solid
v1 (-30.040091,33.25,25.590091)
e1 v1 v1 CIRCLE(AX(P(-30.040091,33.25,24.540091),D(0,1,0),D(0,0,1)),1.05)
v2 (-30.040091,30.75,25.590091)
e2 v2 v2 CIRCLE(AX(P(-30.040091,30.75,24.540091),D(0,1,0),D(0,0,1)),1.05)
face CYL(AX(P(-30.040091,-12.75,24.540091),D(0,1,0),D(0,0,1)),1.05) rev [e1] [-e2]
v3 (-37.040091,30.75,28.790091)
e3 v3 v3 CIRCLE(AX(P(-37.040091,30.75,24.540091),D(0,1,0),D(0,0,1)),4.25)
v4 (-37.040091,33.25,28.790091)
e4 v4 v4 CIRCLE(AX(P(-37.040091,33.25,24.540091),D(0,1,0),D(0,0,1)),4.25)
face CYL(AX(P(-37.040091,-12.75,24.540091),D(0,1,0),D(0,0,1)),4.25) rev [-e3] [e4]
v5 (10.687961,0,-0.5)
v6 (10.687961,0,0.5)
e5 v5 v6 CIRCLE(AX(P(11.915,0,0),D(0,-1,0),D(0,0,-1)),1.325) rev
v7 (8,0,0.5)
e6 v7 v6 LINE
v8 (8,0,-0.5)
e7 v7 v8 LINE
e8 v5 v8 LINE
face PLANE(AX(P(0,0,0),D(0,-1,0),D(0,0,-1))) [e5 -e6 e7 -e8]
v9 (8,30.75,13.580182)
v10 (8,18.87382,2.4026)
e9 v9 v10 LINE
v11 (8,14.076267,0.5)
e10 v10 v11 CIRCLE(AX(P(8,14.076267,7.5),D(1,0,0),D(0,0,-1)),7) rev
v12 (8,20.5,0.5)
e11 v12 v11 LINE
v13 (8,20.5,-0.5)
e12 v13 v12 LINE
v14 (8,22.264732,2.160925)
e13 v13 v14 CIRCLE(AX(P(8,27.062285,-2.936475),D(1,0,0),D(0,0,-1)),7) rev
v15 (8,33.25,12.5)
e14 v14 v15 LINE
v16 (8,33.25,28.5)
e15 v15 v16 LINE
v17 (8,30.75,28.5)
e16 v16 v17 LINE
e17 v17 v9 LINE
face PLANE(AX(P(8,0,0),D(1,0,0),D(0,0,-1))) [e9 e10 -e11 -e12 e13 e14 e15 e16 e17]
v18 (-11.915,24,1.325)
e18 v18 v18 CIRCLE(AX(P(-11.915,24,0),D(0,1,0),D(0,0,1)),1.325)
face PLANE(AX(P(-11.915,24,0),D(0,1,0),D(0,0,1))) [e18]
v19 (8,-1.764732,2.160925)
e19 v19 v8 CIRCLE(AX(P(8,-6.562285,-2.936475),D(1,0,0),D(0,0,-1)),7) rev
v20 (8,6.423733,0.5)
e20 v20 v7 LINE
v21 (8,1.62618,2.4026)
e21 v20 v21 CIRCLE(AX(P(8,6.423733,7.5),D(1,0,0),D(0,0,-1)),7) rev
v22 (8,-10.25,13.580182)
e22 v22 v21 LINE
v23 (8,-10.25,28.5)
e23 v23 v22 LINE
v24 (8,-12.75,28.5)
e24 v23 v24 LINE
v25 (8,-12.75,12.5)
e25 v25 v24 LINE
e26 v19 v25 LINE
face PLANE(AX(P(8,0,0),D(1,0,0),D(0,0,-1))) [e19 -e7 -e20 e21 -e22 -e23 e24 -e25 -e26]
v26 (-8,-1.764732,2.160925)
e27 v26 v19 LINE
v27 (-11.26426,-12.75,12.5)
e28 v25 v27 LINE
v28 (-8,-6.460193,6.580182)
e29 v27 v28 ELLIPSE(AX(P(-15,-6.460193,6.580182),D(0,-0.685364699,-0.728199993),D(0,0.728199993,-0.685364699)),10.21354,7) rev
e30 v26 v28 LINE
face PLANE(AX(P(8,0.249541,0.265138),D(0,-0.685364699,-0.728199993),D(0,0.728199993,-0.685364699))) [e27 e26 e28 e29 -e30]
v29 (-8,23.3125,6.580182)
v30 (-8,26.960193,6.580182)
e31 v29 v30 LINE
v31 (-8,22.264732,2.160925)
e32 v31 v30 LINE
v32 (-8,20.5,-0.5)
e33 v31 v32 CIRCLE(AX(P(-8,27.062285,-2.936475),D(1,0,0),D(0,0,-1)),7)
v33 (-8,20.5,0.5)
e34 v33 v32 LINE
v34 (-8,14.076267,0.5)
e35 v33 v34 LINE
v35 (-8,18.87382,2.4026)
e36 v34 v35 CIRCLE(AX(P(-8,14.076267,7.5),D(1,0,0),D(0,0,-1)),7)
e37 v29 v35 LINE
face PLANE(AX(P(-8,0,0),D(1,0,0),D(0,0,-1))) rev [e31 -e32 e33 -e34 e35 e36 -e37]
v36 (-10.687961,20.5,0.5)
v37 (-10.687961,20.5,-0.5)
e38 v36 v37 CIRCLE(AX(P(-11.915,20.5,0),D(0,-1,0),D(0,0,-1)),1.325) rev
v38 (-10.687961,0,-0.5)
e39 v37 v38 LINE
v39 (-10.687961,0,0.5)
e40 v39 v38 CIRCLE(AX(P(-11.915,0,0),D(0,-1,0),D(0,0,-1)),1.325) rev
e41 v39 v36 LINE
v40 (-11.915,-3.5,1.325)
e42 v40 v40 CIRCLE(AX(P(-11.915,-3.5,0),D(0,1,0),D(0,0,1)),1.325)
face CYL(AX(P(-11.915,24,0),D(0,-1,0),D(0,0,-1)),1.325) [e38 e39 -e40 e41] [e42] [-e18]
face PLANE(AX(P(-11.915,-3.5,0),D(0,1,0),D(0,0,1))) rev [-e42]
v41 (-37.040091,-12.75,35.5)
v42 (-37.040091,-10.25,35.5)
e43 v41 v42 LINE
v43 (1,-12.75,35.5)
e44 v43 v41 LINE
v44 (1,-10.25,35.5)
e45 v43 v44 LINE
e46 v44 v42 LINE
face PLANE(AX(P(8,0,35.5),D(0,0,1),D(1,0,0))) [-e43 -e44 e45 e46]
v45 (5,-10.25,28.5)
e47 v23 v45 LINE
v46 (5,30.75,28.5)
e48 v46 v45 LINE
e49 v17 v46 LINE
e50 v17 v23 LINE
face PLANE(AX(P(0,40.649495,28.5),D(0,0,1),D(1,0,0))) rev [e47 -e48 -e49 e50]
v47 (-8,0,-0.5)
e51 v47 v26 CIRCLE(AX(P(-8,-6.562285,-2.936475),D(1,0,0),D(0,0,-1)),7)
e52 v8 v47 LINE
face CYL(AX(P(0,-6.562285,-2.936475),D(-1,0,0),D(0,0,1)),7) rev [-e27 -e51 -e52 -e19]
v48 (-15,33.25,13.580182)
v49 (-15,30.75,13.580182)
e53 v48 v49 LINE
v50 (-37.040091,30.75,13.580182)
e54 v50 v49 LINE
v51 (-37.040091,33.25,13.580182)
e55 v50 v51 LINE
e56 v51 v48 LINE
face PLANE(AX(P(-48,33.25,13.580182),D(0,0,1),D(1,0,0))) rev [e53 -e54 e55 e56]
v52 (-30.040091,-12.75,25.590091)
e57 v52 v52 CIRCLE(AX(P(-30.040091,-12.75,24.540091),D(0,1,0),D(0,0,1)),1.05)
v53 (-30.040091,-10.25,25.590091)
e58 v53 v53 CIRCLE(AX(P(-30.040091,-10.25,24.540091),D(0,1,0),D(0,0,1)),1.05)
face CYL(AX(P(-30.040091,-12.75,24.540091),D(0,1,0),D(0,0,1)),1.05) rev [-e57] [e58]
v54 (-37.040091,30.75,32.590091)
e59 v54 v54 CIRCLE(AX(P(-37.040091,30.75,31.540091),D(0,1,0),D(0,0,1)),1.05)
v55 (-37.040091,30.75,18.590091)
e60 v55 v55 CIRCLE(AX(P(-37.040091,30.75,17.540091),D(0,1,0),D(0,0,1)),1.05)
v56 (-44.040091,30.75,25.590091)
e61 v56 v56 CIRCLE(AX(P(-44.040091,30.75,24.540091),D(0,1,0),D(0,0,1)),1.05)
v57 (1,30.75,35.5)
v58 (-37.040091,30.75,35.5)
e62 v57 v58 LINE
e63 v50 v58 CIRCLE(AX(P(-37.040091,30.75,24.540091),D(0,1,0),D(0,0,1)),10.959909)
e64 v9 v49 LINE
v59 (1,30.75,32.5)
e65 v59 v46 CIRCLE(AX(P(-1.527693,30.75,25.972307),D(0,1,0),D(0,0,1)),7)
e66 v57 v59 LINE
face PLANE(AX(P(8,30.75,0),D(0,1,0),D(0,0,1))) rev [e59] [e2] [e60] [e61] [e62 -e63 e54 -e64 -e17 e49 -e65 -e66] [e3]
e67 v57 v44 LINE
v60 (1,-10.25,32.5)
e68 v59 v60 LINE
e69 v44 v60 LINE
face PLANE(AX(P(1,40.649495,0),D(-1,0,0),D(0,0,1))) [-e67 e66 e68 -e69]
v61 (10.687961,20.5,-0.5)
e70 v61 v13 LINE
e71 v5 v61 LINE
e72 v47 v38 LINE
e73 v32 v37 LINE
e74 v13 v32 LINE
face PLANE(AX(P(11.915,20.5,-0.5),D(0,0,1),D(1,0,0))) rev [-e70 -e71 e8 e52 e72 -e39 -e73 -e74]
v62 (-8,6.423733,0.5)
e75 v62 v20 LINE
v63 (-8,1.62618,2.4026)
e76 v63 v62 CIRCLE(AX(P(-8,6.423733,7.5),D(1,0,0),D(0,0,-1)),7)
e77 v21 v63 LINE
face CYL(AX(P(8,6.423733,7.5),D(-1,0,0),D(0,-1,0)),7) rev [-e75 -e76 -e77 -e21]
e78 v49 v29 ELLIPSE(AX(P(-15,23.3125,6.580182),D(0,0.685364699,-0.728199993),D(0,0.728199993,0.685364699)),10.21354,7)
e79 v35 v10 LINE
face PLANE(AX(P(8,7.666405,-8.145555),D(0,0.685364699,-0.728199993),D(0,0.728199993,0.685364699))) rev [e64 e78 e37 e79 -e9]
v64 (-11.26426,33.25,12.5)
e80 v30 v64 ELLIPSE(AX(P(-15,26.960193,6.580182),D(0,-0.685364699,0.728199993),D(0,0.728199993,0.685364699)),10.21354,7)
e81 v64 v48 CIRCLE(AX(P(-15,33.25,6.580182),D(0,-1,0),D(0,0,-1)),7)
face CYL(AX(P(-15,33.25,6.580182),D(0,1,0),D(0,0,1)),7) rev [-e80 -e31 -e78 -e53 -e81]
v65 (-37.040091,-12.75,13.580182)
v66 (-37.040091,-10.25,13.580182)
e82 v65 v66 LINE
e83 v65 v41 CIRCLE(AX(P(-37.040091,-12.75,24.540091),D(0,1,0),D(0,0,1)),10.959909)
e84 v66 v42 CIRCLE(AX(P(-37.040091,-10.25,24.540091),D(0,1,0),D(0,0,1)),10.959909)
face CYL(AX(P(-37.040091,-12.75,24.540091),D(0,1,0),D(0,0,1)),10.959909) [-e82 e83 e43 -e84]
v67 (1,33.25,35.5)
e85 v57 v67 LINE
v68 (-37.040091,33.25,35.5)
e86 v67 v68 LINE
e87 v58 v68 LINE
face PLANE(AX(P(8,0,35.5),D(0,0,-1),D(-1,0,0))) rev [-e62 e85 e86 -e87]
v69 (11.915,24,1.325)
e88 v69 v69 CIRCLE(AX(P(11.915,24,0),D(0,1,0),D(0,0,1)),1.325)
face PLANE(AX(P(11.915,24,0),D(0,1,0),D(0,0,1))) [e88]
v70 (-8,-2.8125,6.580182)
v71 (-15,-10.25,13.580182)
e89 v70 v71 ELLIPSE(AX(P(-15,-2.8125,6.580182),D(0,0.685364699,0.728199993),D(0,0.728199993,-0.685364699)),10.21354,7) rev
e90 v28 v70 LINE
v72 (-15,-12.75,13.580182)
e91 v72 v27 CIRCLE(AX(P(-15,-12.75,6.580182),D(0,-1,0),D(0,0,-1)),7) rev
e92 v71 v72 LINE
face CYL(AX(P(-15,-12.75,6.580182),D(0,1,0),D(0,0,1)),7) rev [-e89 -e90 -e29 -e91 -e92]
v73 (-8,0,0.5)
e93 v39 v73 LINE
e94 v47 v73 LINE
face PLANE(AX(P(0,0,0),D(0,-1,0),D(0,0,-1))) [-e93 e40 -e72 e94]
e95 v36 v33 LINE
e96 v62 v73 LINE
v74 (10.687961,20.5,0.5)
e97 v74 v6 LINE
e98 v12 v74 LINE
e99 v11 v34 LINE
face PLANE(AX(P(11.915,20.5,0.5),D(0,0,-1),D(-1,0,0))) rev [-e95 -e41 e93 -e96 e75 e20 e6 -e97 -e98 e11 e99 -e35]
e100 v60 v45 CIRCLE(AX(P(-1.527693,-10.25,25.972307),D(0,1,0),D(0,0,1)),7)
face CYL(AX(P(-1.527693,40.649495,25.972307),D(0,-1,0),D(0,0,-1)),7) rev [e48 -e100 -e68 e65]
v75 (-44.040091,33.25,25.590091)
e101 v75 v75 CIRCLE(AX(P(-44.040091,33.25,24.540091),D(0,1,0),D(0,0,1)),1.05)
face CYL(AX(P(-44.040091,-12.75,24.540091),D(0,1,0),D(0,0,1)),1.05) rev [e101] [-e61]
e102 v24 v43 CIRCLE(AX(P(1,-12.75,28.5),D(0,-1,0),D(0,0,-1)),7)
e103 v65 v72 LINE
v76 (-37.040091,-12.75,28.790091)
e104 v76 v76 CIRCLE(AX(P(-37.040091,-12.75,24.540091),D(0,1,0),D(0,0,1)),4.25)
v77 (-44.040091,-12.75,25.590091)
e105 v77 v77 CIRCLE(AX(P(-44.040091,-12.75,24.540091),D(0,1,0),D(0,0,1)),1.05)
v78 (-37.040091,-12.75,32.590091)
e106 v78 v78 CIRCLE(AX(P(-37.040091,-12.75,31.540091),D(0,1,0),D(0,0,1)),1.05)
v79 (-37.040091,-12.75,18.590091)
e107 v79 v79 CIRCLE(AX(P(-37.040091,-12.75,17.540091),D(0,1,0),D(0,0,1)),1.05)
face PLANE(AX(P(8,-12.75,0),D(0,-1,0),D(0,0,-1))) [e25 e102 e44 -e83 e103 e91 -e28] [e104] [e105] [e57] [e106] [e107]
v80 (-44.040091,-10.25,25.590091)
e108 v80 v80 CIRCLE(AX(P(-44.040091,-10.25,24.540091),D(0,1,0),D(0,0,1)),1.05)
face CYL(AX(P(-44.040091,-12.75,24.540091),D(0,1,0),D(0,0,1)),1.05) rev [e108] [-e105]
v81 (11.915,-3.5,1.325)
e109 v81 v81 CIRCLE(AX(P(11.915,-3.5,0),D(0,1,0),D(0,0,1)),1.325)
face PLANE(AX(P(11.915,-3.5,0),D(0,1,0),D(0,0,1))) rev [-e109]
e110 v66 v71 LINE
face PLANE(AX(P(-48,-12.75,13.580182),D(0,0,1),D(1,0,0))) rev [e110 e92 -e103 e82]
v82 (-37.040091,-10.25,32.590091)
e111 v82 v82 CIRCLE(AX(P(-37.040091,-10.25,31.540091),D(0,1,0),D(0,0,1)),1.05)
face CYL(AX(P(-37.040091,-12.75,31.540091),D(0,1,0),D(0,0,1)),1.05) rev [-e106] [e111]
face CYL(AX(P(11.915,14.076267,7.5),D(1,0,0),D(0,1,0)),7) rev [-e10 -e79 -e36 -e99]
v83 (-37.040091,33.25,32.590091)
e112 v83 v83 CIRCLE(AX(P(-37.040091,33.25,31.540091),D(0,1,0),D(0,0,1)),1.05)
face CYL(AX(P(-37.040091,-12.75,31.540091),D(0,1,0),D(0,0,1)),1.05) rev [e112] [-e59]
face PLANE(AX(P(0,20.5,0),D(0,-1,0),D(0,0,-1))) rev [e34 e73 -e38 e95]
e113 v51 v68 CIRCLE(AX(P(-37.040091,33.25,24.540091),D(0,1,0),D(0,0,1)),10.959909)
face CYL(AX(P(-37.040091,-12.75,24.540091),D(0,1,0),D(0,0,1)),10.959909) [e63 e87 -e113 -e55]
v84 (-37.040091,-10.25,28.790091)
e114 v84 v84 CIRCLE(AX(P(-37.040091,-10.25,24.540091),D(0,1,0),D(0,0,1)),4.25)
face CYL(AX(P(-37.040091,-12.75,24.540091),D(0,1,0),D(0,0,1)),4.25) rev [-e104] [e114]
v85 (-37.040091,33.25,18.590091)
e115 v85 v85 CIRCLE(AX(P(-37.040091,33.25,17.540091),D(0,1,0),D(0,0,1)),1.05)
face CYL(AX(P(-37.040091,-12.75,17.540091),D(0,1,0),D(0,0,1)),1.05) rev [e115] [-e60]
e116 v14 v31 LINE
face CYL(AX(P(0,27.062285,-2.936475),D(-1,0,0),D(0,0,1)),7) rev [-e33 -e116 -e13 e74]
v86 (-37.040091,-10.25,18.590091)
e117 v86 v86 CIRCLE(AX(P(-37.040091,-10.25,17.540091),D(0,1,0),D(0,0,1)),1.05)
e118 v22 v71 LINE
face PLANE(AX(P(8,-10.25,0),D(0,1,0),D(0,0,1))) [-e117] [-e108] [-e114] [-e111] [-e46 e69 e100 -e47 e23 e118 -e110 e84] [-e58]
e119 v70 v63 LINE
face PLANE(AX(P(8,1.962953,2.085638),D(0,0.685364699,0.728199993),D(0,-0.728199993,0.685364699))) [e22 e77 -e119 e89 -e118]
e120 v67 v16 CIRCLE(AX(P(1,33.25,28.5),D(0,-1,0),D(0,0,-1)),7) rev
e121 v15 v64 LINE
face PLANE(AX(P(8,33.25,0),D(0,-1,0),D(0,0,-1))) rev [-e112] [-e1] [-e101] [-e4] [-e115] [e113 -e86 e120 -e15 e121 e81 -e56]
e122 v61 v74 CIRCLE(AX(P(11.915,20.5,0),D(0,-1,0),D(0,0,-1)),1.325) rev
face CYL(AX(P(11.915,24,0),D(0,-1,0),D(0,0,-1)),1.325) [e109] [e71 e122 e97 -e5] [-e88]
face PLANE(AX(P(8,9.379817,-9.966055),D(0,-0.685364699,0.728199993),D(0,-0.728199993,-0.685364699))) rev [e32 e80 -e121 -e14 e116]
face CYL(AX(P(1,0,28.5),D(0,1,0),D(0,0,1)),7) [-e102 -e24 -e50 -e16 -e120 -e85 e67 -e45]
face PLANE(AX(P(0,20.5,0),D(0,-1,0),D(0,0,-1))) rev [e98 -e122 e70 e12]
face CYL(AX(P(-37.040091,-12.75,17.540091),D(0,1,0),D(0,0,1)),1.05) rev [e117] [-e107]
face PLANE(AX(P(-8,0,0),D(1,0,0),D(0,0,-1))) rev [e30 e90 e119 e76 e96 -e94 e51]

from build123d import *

# Parameters (mm, degrees)
SKETCH1_W           = 23.83
SKETCH1_H           = 1
BOSS_EXTRUDE1_DEPTH = 20.5
SKETCH2_R           = 1.325
BOSS_EXTRUDE2_DEPTH = 13.75
BOSS_EXTRUDE4_DEPTH = 8
SKETCH5_W           = 21.919818374
SKETCH5_H           = 2.5
BOSS_EXTRUDE5_DEPTH = 40
SKETCH6_R           = 4.25
SKETCH6_R_2         = 1.05
CUT_EXTRUDE1_DEPTH  = 76.367433285
FILLET1_R           = 7
FILLET2_R           = 7
FILLET3_R           = 7
BOSS_EXTRUDE6_START = 41
BOSS_EXTRUDE6_DEPTH = 41


with BuildPart() as part:
    # Sketch1 → Boss-Extrude1 (new body)
    with BuildSketch(Plane(origin=(0, 0, 0), x_dir=(1, 0, 0), z_dir=(0, 1, 0))):
        Rectangle(SKETCH1_W, SKETCH1_H)
    extrude(amount=BOSS_EXTRUDE1_DEPTH)

    # Sketch2 → Boss-Extrude2 (add, symmetric)
    with BuildSketch(Plane(origin=(0, 10.25, 0), x_dir=(1, 0, 0), z_dir=(0, 1, 0))):
        with Locations(Location((-11.915, 0, 0), (0, 0, 270))):
            Circle(SKETCH2_R)
        with Locations(Location((11.915, 0, 0), (0, 0, 270))):
            Circle(SKETCH2_R)
    extrude(amount=BOSS_EXTRUDE2_DEPTH, both=True)

    # Sketch4 → Boss-Extrude4 (add, symmetric)
    with BuildSketch(Plane(origin=(0, 0, 0), x_dir=(0, 0, -1), z_dir=(1, 0, 0))):
        Polygon((-0.5, 16.852307022), (-0.5, 20.5), (-12.5, 33.25), (-35.5, 33.25), (-35.5, 30.75), (-13.580181626, 30.75), align=None)
        Polygon((-0.5, 0), (-0.5, 3.647692978), (-13.580181626, -10.25), (-35.5, -10.25), (-35.5, -12.75), (-12.5, -12.75), align=None)
    extrude(amount=BOSS_EXTRUDE4_DEPTH, both=True)

    # Sketch5 → Boss-Extrude5 (add)
    with BuildSketch(Plane.ZY.offset(8)):
        with Locations((24.540090813, 32)):
            Rectangle(SKETCH5_W, SKETCH5_H)
        with Locations((24.540090813, -11.5)):
            Rectangle(SKETCH5_W, SKETCH5_H)
    extrude(amount=BOSS_EXTRUDE5_DEPTH)

    # Sketch6 → Cut-Extrude1 (cut, through all)
    with BuildSketch(Plane(origin=(0, 33.25, 0), x_dir=(1, 0, 0), z_dir=(0, 1, 0))):
        with Locations(Location((-37.040090813, -24.540090813, 0), (0, 0, 270))):
            Circle(SKETCH6_R)
        with Locations(Location((-44.040090813, -24.540090813, 0), (0, 0, 270))):
            Circle(SKETCH6_R_2)
        with Locations(Location((-37.040090813, -17.540090813, 0), (0, 0, 270))):
            Circle(SKETCH6_R_2)
        with Locations(Location((-30.040090813, -24.540090813, 0), (0, 0, 270))):
            Circle(SKETCH6_R_2)
        with Locations(Location((-37.040090813, -31.540090813, 0), (0, 0, 270))):
            Circle(SKETCH6_R_2)
        with BuildLine():
            ThreePointArc((-48, -24.540090813), (-44.78991692, -16.790264706), (-37.040090813, -13.580181626))
            Line((-37.040090813, -13.580181626), (-48, -13.580181626))
            Line((-48, -13.580181626), (-48, -24.540090813))
        make_face()
        with BuildLine():
            ThreePointArc((-37.040090813, -35.5), (-44.78991692, -32.28991692), (-48, -24.540090813))
            Line((-48, -24.540090813), (-48, -35.5))
            Line((-48, -35.5), (-37.040090813, -35.5))
        make_face()
    extrude(amount=-CUT_EXTRUDE1_DEPTH, mode=Mode.SUBTRACT)

    # Fillet1
    # the kernel refuses this fillet: 7 mm, written as the material it adds along each edge
    with BuildSketch(Plane(origin=(-8, -12.75, 13.580181626), x_dir=(-1, 0, 0), z_dir=(0, 1, 0))) as fillet1_piece_1_section:
        with BuildLine():
            CenterArc((FILLET1_R, -FILLET1_R), FILLET1_R, 90, 90)
            Line((0, -FILLET1_R), (0, 0))
            Line((0, 0), (FILLET1_R, 0))
        make_face()
    fillet1_piece_1 = extrude(amount=2.5, mode=Mode.PRIVATE)
    fillet1_piece_1 = split(fillet1_piece_1, bisect_by=Plane(origin=(-10.020174451, -12.153760937, 11.938833823), z_dir=(0, 0.6853646990049913, 0.7281999926928027)), keep=Keep.TOP, mode=Mode.PRIVATE)
    fillet1_piece_1 = split(fillet1_piece_1, bisect_by=Plane(origin=(-10.020174451, -10.440349189, 13.759333804), z_dir=(0, -0.685364699004991, -0.7281999926928029)), keep=Keep.TOP, mode=Mode.PRIVATE)
    add(fillet1_piece_1)
    with BuildSketch(Plane(origin=(-8, -12.75, 13.580181626), x_dir=(-1, 0, 0), z_dir=(0, 1, 0))) as fillet1_piece_2_section:
        with BuildLine():
            CenterArc((FILLET1_R, -FILLET1_R), FILLET1_R, 90, 90)
            Line((0, -FILLET1_R), (0, 0))
            Line((0, 0), (FILLET1_R, 0))
        make_face()
    fillet1_piece_2 = extrude(amount=20, mode=Mode.PRIVATE)
    fillet1_piece_2 = split(fillet1_piece_2, bisect_by=Plane(origin=(-8.816209607, -9.698679662, 9.628169093), z_dir=(0, 0.6853646990049913, 0.7281999926928027)), keep=Keep.TOP, mode=Mode.PRIVATE)
    fillet1_piece_2 = split(fillet1_piece_2, bisect_by=Plane(origin=(-8.816209607, -10.25, 10.809130305), z_dir=(0, 1, 0)), keep=Keep.TOP, mode=Mode.PRIVATE)
    fillet1_piece_2 = split(fillet1_piece_2, bisect_by=Plane(origin=(-8.816209607, -7.985267914, 11.448669075), z_dir=(0, -0.685364699004991, -0.7281999926928029)), keep=Keep.TOP, mode=Mode.PRIVATE)
    add(fillet1_piece_2)
    with BuildSketch(Plane(origin=(-8, 33.25, 13.580181626), x_dir=(0, 0, -1), z_dir=(0, -1, 0))) as fillet1_piece_3_section:
        with BuildLine():
            CenterArc((FILLET1_R, -FILLET1_R), FILLET1_R, 90, 90)
            Line((0, -FILLET1_R), (0, 0))
            Line((0, 0), (FILLET1_R, 0))
        make_face()
    fillet1_piece_3 = extrude(amount=2.5, mode=Mode.PRIVATE)
    fillet1_piece_3 = split(fillet1_piece_3, bisect_by=Plane(origin=(-10.020174451, 32.653760936, 11.938833823), z_dir=(0, -0.6853646990049912, 0.7281999926928028)), keep=Keep.TOP, mode=Mode.PRIVATE)
    fillet1_piece_3 = split(fillet1_piece_3, bisect_by=Plane(origin=(-10.020174451, 30.940349189, 13.759333804), z_dir=(0, 0.6853646990049909, -0.7281999926928031)), keep=Keep.TOP, mode=Mode.PRIVATE)
    add(fillet1_piece_3)
    with BuildSketch(Plane(origin=(-8, 33.25, 13.580181626), x_dir=(0, 0, -1), z_dir=(0, -1, 0))) as fillet1_piece_4_section:
        with BuildLine():
            CenterArc((FILLET1_R, -FILLET1_R), FILLET1_R, 90, 90)
            Line((0, -FILLET1_R), (0, 0))
            Line((0, 0), (FILLET1_R, 0))
        make_face()
    fillet1_piece_4 = extrude(amount=20, mode=Mode.PRIVATE)
    fillet1_piece_4 = split(fillet1_piece_4, bisect_by=Plane(origin=(-8.816209616, 30.198679665, 9.628169097), z_dir=(0, -0.6853646990049912, 0.7281999926928028)), keep=Keep.TOP, mode=Mode.PRIVATE)
    fillet1_piece_4 = split(fillet1_piece_4, bisect_by=Plane(origin=(-8.816209616, 28.485267918, 11.448669078), z_dir=(0, 0.6853646990049909, -0.7281999926928031)), keep=Keep.TOP, mode=Mode.PRIVATE)
    fillet1_piece_4 = split(fillet1_piece_4, bisect_by=Plane(origin=(-8.816209616, 30.75, 10.809130308), z_dir=(0, -1, 0)), keep=Keep.TOP, mode=Mode.PRIVATE)
    add(fillet1_piece_4)
    # the kernel refuses this fillet: 7 mm, written as the material it takes off along each edge
    with BuildSketch(Plane(origin=(8, 7.25, 35.5), x_dir=(0, 0, -1), z_dir=(0, -1, 0))) as fillet1_2_piece_1:
        with BuildLine():
            CenterArc((FILLET1_R, -FILLET1_R), FILLET1_R, 90, 90)
            Line((0, -FILLET1_R), (0, 0))
            Line((0, 0), (FILLET1_R, 0))
        make_face()
    extrude(amount=37.5, mode=Mode.SUBTRACT)
    with BuildSketch(Plane(origin=(8, 50.75, 35.5), x_dir=(-1, 0, 0), z_dir=(0, -1, 0))) as fillet1_2_piece_2:
        with BuildLine():
            CenterArc((FILLET1_R, FILLET1_R), FILLET1_R, 180, 90)
            Line((0, FILLET1_R), (0, 0))
            Line((0, 0), (FILLET1_R, 0))
        make_face()
    extrude(amount=37.5, mode=Mode.SUBTRACT)

    # Fillet2
    fillet2_edges = [part.edges().sort_by_distance(p)[0] for p in [
        (0, 16.852307022, 0.5),
        (0, 3.647692978, 0.5),
    ]]
    fillet(fillet2_edges, radius=FILLET2_R)

    # Fillet3
    # the kernel refuses this fillet: 7 mm, written as the material it adds along each edge
    with BuildSketch(Plane(origin=(-8, 20.5, 0.5), x_dir=(0, 0.7281999926925888, 0.6853646990052185), z_dir=(1, 0, 0))) as fillet3_piece_1:
        with BuildLine():
            CenterArc((2.423417163, -7), FILLET3_R, 90, 26.366519243)
            Line((-0.685364699, -0.728199993), (0, 0))
            Line((0, 0), (2.423417163, 0))
        make_face()
    extrude(amount=16)
    with BuildSketch(Plane(origin=(8, 0, 0.5), x_dir=(0, 0, -1), z_dir=(-1, 0, 0))) as fillet3_piece_2:
        with BuildLine():
            CenterArc((3.436475374, 6.562285254), FILLET3_R, 223.264295411, 26.366519243)
            Line((-1.660924575, 1.764732361), (0, 0))
            Line((0, 0), (1, 0))
        make_face()
    extrude(amount=16)

    # Sketch8 → Boss-Extrude6 (add)
    with BuildSketch(Plane(origin=(0, -10.25, 0), x_dir=(1, 0, 0), z_dir=(0, 1, 0)).offset(BOSS_EXTRUDE6_START)):
        with BuildLine():
            ThreePointArc((1, -35.5), (5.949747468, -33.449747468), (8, -28.5))
            Line((8, -28.5), (5, -28.5))
            ThreePointArc((5, -28.5), (3.422054899, -30.922054899), (1, -32.5))
            Line((1, -32.5), (1, -35.5))
        make_face()
    extrude(amount=-BOSS_EXTRUDE6_DEPTH)


solid = part.part
